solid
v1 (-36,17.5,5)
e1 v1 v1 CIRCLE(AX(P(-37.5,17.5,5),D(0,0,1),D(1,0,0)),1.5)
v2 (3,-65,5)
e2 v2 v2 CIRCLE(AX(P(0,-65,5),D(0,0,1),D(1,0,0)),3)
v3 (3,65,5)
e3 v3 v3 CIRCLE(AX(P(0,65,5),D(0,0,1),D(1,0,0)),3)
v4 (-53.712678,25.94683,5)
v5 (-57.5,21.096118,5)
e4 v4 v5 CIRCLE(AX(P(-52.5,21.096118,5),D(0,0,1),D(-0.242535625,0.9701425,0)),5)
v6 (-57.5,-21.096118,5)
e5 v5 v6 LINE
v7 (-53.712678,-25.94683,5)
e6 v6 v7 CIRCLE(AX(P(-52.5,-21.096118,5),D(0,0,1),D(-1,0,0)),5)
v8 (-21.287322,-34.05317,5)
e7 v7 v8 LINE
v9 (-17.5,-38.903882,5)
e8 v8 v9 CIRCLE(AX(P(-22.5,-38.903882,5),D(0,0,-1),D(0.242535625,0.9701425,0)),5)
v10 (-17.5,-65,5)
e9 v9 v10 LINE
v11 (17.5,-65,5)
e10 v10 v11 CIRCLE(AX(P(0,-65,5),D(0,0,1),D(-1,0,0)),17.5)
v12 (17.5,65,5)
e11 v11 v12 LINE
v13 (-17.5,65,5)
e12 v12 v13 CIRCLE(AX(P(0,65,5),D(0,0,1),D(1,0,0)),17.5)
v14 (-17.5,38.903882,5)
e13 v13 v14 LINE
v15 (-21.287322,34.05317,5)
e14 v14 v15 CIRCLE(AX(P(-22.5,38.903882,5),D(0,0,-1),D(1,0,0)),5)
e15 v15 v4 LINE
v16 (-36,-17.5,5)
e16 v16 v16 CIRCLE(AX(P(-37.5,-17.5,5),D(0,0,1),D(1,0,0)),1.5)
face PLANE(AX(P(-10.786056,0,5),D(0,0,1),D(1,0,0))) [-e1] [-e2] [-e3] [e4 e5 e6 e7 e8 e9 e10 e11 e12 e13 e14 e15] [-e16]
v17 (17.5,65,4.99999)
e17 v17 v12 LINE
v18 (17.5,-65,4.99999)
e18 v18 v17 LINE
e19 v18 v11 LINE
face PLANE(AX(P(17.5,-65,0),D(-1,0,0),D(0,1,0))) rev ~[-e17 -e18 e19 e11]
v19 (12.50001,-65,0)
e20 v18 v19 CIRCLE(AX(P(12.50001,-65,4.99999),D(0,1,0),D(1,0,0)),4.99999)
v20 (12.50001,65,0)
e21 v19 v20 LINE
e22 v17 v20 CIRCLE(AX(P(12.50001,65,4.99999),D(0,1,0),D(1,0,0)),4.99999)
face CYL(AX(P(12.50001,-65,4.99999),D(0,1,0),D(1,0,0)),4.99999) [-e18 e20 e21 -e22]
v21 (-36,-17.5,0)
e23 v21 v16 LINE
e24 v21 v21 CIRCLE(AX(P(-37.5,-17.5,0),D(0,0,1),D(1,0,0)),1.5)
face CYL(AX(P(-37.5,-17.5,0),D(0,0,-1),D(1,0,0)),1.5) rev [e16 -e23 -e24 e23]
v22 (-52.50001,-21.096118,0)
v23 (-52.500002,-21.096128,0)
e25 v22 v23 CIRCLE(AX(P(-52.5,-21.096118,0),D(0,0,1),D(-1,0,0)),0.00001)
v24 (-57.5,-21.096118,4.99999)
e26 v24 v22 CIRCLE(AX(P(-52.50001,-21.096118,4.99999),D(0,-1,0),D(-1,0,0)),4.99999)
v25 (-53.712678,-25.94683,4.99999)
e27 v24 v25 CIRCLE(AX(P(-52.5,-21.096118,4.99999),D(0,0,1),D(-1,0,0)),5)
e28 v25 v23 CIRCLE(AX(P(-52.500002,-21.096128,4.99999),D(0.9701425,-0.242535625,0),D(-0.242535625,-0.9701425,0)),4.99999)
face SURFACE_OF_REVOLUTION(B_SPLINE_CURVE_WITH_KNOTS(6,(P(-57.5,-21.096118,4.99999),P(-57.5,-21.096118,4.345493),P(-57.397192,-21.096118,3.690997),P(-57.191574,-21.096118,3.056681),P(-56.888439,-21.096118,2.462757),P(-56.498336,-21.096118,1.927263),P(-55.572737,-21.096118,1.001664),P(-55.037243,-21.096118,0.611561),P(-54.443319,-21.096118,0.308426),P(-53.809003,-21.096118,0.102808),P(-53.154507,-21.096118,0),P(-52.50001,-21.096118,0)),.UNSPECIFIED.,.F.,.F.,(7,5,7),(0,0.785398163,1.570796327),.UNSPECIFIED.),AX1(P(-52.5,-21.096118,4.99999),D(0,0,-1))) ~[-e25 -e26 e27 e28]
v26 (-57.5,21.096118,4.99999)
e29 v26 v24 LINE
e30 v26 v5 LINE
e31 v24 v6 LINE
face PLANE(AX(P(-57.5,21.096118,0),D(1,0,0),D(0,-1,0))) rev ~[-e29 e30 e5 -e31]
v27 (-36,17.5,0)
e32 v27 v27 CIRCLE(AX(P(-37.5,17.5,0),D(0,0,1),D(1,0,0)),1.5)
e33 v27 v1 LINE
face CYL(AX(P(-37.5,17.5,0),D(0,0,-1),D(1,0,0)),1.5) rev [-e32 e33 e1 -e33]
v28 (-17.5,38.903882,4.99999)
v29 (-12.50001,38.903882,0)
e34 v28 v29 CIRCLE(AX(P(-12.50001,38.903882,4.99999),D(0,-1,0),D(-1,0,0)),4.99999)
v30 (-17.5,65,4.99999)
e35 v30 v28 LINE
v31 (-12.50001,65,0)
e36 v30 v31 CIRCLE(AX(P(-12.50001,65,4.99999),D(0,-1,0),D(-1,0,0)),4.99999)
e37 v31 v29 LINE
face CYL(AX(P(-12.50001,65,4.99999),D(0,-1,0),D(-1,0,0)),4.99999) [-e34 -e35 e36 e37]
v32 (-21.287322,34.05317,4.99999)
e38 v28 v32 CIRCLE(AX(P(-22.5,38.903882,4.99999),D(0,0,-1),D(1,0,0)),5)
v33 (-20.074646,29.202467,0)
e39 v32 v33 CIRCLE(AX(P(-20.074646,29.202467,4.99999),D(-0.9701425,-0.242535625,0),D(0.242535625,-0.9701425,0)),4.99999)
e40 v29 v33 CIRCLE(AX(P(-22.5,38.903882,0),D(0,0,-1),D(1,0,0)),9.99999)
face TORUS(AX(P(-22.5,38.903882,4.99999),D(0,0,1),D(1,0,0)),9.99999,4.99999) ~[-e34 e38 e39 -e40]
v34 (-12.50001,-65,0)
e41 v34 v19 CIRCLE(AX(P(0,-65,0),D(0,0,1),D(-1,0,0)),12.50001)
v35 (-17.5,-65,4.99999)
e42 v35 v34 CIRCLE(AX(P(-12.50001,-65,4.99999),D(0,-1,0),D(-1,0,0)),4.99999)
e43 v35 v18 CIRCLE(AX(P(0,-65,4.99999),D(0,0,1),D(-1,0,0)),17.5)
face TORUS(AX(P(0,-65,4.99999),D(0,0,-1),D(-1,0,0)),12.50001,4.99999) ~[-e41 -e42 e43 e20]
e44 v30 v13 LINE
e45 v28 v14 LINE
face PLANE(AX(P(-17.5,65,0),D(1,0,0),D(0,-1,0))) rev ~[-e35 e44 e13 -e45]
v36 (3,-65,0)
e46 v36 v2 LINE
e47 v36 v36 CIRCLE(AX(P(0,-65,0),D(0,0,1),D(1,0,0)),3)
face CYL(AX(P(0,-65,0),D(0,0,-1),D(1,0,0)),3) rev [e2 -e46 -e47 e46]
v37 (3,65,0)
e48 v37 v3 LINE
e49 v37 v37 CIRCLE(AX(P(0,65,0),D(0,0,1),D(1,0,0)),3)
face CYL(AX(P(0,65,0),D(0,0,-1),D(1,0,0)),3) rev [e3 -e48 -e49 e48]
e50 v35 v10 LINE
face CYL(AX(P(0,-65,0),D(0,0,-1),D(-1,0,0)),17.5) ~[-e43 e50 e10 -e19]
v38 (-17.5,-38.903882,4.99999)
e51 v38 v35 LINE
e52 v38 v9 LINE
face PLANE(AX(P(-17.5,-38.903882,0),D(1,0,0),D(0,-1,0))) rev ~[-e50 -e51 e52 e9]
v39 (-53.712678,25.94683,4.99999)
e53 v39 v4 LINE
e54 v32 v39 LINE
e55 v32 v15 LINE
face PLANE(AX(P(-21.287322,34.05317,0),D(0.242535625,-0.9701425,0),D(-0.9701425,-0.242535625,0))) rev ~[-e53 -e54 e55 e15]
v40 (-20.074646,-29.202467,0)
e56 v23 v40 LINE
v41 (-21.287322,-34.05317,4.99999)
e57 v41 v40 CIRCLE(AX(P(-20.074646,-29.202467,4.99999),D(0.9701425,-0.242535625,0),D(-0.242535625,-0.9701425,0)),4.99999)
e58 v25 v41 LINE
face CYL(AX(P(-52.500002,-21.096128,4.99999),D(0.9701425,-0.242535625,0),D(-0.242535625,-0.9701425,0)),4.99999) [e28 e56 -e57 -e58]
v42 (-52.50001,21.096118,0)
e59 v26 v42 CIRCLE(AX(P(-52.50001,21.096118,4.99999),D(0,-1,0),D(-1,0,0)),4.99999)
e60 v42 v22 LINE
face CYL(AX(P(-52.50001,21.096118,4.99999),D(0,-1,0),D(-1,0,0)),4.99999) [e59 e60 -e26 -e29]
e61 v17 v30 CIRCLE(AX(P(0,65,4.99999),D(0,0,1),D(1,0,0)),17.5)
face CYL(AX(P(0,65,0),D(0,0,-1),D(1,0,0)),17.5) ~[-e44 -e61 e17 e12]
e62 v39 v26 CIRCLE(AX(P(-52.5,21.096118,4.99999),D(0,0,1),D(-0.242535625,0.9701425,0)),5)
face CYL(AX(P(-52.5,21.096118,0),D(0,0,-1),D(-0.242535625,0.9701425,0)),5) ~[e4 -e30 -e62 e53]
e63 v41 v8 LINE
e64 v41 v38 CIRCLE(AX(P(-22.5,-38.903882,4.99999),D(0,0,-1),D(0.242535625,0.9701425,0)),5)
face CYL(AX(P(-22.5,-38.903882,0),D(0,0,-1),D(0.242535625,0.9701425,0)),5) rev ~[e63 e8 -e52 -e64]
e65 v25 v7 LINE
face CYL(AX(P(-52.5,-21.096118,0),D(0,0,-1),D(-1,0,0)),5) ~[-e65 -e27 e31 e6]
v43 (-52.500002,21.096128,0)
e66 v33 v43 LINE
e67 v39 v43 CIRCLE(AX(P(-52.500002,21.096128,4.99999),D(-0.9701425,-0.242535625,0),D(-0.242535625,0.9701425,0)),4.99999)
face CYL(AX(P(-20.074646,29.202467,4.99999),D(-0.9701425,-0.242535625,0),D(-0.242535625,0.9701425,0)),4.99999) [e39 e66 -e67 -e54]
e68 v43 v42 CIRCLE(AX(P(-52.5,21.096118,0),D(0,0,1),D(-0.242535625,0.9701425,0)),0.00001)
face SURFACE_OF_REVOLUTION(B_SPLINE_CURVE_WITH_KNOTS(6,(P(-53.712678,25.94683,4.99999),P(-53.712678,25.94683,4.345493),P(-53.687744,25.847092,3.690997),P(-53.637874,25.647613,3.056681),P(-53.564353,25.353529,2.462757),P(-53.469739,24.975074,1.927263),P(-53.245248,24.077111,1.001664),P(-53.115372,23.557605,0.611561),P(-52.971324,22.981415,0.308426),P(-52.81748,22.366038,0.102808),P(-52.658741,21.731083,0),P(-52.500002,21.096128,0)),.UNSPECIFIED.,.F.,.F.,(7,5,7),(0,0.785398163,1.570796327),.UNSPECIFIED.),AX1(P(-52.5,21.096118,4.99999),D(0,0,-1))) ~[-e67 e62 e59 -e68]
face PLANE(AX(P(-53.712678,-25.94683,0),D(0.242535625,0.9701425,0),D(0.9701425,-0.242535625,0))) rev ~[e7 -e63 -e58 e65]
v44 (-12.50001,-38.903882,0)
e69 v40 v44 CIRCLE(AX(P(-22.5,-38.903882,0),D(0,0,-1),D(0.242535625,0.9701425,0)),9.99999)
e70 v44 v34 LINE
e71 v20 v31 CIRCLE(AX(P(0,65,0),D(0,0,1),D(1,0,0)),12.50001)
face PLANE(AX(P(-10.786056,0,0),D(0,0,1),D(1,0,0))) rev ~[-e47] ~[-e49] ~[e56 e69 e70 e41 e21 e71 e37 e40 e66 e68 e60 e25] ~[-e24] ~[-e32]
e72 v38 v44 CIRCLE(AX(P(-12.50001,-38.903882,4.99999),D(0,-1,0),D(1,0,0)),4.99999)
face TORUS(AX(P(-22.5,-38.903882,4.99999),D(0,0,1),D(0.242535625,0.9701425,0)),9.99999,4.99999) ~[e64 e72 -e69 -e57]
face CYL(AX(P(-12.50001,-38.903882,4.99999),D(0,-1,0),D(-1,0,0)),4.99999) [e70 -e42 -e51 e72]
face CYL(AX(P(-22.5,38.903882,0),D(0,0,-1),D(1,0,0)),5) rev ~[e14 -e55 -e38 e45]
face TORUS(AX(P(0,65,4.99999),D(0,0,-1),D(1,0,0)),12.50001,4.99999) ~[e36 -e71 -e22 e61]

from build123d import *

# Parameters (mm, degrees)
F0_R     = 1.5
F0_R_2   = 3
F1_DEPTH = 5
F2_R     = 4.99999


# Not quite as in the source:
# - a fillet or chamfer is up to 0.001 mm smaller than in the source, because OpenCascade refuses the exact size


with BuildPart() as f1:
    # F0 (on Top) → F1 (new body)
    with BuildSketch(Plane.XY):
        with BuildLine():
            Line((17.5, -65), (17.5, 65))
            ThreePointArc((17.5, 65), (0, 82.5), (-17.5, 65))
            Line((-17.5, 65), (-17.5, 38.903882032))
            ThreePointArc((-17.5, 38.903882032), (-18.5589728099, 35.826820985), (-21.2873218748, 34.0531695313))
            Line((-21.2873218748, 34.0531695313), (-53.7126781252, 25.9468304687))
            ThreePointArc((-53.7126781252, 25.9468304687), (-56.4410271901, 24.173179015), (-57.5, 21.096117968))
            Line((-57.5, 21.096117968), (-57.5, -21.096117968))
            ThreePointArc((-57.5, -21.096117968), (-56.4410271901, -24.173179015), (-53.7126781252, -25.9468304687))
            Line((-53.7126781252, -25.9468304687), (-21.2873218748, -34.0531695313))
            ThreePointArc((-21.2873218748, -34.0531695313), (-18.5589728099, -35.826820985), (-17.5, -38.903882032))
            Line((-17.5, -38.903882032), (-17.5, -65))
            ThreePointArc((-17.5, -65), (0, -82.5), (17.5, -65))
        make_face()
        with Locations((-37.5, -17.5)):
            Circle(F0_R, mode=Mode.SUBTRACT)
        with Locations((0, -65)):
            Circle(F0_R_2, mode=Mode.SUBTRACT)
        with Locations((-37.5, 17.5)):
            Circle(F0_R, mode=Mode.SUBTRACT)
        with Locations((0, 65)):
            Circle(F0_R_2, mode=Mode.SUBTRACT)
    extrude(amount=F1_DEPTH)

    # F2 (radius 5 in the source; OpenCascade refuses exactly that, so slightly less here)
    f2_edges = [f1.edges().sort_by_distance(p)[0] for p in [
        (17.5, 0, 0),
    ]]
    fillet(f2_edges, radius=F2_R)


solid = f1.part
